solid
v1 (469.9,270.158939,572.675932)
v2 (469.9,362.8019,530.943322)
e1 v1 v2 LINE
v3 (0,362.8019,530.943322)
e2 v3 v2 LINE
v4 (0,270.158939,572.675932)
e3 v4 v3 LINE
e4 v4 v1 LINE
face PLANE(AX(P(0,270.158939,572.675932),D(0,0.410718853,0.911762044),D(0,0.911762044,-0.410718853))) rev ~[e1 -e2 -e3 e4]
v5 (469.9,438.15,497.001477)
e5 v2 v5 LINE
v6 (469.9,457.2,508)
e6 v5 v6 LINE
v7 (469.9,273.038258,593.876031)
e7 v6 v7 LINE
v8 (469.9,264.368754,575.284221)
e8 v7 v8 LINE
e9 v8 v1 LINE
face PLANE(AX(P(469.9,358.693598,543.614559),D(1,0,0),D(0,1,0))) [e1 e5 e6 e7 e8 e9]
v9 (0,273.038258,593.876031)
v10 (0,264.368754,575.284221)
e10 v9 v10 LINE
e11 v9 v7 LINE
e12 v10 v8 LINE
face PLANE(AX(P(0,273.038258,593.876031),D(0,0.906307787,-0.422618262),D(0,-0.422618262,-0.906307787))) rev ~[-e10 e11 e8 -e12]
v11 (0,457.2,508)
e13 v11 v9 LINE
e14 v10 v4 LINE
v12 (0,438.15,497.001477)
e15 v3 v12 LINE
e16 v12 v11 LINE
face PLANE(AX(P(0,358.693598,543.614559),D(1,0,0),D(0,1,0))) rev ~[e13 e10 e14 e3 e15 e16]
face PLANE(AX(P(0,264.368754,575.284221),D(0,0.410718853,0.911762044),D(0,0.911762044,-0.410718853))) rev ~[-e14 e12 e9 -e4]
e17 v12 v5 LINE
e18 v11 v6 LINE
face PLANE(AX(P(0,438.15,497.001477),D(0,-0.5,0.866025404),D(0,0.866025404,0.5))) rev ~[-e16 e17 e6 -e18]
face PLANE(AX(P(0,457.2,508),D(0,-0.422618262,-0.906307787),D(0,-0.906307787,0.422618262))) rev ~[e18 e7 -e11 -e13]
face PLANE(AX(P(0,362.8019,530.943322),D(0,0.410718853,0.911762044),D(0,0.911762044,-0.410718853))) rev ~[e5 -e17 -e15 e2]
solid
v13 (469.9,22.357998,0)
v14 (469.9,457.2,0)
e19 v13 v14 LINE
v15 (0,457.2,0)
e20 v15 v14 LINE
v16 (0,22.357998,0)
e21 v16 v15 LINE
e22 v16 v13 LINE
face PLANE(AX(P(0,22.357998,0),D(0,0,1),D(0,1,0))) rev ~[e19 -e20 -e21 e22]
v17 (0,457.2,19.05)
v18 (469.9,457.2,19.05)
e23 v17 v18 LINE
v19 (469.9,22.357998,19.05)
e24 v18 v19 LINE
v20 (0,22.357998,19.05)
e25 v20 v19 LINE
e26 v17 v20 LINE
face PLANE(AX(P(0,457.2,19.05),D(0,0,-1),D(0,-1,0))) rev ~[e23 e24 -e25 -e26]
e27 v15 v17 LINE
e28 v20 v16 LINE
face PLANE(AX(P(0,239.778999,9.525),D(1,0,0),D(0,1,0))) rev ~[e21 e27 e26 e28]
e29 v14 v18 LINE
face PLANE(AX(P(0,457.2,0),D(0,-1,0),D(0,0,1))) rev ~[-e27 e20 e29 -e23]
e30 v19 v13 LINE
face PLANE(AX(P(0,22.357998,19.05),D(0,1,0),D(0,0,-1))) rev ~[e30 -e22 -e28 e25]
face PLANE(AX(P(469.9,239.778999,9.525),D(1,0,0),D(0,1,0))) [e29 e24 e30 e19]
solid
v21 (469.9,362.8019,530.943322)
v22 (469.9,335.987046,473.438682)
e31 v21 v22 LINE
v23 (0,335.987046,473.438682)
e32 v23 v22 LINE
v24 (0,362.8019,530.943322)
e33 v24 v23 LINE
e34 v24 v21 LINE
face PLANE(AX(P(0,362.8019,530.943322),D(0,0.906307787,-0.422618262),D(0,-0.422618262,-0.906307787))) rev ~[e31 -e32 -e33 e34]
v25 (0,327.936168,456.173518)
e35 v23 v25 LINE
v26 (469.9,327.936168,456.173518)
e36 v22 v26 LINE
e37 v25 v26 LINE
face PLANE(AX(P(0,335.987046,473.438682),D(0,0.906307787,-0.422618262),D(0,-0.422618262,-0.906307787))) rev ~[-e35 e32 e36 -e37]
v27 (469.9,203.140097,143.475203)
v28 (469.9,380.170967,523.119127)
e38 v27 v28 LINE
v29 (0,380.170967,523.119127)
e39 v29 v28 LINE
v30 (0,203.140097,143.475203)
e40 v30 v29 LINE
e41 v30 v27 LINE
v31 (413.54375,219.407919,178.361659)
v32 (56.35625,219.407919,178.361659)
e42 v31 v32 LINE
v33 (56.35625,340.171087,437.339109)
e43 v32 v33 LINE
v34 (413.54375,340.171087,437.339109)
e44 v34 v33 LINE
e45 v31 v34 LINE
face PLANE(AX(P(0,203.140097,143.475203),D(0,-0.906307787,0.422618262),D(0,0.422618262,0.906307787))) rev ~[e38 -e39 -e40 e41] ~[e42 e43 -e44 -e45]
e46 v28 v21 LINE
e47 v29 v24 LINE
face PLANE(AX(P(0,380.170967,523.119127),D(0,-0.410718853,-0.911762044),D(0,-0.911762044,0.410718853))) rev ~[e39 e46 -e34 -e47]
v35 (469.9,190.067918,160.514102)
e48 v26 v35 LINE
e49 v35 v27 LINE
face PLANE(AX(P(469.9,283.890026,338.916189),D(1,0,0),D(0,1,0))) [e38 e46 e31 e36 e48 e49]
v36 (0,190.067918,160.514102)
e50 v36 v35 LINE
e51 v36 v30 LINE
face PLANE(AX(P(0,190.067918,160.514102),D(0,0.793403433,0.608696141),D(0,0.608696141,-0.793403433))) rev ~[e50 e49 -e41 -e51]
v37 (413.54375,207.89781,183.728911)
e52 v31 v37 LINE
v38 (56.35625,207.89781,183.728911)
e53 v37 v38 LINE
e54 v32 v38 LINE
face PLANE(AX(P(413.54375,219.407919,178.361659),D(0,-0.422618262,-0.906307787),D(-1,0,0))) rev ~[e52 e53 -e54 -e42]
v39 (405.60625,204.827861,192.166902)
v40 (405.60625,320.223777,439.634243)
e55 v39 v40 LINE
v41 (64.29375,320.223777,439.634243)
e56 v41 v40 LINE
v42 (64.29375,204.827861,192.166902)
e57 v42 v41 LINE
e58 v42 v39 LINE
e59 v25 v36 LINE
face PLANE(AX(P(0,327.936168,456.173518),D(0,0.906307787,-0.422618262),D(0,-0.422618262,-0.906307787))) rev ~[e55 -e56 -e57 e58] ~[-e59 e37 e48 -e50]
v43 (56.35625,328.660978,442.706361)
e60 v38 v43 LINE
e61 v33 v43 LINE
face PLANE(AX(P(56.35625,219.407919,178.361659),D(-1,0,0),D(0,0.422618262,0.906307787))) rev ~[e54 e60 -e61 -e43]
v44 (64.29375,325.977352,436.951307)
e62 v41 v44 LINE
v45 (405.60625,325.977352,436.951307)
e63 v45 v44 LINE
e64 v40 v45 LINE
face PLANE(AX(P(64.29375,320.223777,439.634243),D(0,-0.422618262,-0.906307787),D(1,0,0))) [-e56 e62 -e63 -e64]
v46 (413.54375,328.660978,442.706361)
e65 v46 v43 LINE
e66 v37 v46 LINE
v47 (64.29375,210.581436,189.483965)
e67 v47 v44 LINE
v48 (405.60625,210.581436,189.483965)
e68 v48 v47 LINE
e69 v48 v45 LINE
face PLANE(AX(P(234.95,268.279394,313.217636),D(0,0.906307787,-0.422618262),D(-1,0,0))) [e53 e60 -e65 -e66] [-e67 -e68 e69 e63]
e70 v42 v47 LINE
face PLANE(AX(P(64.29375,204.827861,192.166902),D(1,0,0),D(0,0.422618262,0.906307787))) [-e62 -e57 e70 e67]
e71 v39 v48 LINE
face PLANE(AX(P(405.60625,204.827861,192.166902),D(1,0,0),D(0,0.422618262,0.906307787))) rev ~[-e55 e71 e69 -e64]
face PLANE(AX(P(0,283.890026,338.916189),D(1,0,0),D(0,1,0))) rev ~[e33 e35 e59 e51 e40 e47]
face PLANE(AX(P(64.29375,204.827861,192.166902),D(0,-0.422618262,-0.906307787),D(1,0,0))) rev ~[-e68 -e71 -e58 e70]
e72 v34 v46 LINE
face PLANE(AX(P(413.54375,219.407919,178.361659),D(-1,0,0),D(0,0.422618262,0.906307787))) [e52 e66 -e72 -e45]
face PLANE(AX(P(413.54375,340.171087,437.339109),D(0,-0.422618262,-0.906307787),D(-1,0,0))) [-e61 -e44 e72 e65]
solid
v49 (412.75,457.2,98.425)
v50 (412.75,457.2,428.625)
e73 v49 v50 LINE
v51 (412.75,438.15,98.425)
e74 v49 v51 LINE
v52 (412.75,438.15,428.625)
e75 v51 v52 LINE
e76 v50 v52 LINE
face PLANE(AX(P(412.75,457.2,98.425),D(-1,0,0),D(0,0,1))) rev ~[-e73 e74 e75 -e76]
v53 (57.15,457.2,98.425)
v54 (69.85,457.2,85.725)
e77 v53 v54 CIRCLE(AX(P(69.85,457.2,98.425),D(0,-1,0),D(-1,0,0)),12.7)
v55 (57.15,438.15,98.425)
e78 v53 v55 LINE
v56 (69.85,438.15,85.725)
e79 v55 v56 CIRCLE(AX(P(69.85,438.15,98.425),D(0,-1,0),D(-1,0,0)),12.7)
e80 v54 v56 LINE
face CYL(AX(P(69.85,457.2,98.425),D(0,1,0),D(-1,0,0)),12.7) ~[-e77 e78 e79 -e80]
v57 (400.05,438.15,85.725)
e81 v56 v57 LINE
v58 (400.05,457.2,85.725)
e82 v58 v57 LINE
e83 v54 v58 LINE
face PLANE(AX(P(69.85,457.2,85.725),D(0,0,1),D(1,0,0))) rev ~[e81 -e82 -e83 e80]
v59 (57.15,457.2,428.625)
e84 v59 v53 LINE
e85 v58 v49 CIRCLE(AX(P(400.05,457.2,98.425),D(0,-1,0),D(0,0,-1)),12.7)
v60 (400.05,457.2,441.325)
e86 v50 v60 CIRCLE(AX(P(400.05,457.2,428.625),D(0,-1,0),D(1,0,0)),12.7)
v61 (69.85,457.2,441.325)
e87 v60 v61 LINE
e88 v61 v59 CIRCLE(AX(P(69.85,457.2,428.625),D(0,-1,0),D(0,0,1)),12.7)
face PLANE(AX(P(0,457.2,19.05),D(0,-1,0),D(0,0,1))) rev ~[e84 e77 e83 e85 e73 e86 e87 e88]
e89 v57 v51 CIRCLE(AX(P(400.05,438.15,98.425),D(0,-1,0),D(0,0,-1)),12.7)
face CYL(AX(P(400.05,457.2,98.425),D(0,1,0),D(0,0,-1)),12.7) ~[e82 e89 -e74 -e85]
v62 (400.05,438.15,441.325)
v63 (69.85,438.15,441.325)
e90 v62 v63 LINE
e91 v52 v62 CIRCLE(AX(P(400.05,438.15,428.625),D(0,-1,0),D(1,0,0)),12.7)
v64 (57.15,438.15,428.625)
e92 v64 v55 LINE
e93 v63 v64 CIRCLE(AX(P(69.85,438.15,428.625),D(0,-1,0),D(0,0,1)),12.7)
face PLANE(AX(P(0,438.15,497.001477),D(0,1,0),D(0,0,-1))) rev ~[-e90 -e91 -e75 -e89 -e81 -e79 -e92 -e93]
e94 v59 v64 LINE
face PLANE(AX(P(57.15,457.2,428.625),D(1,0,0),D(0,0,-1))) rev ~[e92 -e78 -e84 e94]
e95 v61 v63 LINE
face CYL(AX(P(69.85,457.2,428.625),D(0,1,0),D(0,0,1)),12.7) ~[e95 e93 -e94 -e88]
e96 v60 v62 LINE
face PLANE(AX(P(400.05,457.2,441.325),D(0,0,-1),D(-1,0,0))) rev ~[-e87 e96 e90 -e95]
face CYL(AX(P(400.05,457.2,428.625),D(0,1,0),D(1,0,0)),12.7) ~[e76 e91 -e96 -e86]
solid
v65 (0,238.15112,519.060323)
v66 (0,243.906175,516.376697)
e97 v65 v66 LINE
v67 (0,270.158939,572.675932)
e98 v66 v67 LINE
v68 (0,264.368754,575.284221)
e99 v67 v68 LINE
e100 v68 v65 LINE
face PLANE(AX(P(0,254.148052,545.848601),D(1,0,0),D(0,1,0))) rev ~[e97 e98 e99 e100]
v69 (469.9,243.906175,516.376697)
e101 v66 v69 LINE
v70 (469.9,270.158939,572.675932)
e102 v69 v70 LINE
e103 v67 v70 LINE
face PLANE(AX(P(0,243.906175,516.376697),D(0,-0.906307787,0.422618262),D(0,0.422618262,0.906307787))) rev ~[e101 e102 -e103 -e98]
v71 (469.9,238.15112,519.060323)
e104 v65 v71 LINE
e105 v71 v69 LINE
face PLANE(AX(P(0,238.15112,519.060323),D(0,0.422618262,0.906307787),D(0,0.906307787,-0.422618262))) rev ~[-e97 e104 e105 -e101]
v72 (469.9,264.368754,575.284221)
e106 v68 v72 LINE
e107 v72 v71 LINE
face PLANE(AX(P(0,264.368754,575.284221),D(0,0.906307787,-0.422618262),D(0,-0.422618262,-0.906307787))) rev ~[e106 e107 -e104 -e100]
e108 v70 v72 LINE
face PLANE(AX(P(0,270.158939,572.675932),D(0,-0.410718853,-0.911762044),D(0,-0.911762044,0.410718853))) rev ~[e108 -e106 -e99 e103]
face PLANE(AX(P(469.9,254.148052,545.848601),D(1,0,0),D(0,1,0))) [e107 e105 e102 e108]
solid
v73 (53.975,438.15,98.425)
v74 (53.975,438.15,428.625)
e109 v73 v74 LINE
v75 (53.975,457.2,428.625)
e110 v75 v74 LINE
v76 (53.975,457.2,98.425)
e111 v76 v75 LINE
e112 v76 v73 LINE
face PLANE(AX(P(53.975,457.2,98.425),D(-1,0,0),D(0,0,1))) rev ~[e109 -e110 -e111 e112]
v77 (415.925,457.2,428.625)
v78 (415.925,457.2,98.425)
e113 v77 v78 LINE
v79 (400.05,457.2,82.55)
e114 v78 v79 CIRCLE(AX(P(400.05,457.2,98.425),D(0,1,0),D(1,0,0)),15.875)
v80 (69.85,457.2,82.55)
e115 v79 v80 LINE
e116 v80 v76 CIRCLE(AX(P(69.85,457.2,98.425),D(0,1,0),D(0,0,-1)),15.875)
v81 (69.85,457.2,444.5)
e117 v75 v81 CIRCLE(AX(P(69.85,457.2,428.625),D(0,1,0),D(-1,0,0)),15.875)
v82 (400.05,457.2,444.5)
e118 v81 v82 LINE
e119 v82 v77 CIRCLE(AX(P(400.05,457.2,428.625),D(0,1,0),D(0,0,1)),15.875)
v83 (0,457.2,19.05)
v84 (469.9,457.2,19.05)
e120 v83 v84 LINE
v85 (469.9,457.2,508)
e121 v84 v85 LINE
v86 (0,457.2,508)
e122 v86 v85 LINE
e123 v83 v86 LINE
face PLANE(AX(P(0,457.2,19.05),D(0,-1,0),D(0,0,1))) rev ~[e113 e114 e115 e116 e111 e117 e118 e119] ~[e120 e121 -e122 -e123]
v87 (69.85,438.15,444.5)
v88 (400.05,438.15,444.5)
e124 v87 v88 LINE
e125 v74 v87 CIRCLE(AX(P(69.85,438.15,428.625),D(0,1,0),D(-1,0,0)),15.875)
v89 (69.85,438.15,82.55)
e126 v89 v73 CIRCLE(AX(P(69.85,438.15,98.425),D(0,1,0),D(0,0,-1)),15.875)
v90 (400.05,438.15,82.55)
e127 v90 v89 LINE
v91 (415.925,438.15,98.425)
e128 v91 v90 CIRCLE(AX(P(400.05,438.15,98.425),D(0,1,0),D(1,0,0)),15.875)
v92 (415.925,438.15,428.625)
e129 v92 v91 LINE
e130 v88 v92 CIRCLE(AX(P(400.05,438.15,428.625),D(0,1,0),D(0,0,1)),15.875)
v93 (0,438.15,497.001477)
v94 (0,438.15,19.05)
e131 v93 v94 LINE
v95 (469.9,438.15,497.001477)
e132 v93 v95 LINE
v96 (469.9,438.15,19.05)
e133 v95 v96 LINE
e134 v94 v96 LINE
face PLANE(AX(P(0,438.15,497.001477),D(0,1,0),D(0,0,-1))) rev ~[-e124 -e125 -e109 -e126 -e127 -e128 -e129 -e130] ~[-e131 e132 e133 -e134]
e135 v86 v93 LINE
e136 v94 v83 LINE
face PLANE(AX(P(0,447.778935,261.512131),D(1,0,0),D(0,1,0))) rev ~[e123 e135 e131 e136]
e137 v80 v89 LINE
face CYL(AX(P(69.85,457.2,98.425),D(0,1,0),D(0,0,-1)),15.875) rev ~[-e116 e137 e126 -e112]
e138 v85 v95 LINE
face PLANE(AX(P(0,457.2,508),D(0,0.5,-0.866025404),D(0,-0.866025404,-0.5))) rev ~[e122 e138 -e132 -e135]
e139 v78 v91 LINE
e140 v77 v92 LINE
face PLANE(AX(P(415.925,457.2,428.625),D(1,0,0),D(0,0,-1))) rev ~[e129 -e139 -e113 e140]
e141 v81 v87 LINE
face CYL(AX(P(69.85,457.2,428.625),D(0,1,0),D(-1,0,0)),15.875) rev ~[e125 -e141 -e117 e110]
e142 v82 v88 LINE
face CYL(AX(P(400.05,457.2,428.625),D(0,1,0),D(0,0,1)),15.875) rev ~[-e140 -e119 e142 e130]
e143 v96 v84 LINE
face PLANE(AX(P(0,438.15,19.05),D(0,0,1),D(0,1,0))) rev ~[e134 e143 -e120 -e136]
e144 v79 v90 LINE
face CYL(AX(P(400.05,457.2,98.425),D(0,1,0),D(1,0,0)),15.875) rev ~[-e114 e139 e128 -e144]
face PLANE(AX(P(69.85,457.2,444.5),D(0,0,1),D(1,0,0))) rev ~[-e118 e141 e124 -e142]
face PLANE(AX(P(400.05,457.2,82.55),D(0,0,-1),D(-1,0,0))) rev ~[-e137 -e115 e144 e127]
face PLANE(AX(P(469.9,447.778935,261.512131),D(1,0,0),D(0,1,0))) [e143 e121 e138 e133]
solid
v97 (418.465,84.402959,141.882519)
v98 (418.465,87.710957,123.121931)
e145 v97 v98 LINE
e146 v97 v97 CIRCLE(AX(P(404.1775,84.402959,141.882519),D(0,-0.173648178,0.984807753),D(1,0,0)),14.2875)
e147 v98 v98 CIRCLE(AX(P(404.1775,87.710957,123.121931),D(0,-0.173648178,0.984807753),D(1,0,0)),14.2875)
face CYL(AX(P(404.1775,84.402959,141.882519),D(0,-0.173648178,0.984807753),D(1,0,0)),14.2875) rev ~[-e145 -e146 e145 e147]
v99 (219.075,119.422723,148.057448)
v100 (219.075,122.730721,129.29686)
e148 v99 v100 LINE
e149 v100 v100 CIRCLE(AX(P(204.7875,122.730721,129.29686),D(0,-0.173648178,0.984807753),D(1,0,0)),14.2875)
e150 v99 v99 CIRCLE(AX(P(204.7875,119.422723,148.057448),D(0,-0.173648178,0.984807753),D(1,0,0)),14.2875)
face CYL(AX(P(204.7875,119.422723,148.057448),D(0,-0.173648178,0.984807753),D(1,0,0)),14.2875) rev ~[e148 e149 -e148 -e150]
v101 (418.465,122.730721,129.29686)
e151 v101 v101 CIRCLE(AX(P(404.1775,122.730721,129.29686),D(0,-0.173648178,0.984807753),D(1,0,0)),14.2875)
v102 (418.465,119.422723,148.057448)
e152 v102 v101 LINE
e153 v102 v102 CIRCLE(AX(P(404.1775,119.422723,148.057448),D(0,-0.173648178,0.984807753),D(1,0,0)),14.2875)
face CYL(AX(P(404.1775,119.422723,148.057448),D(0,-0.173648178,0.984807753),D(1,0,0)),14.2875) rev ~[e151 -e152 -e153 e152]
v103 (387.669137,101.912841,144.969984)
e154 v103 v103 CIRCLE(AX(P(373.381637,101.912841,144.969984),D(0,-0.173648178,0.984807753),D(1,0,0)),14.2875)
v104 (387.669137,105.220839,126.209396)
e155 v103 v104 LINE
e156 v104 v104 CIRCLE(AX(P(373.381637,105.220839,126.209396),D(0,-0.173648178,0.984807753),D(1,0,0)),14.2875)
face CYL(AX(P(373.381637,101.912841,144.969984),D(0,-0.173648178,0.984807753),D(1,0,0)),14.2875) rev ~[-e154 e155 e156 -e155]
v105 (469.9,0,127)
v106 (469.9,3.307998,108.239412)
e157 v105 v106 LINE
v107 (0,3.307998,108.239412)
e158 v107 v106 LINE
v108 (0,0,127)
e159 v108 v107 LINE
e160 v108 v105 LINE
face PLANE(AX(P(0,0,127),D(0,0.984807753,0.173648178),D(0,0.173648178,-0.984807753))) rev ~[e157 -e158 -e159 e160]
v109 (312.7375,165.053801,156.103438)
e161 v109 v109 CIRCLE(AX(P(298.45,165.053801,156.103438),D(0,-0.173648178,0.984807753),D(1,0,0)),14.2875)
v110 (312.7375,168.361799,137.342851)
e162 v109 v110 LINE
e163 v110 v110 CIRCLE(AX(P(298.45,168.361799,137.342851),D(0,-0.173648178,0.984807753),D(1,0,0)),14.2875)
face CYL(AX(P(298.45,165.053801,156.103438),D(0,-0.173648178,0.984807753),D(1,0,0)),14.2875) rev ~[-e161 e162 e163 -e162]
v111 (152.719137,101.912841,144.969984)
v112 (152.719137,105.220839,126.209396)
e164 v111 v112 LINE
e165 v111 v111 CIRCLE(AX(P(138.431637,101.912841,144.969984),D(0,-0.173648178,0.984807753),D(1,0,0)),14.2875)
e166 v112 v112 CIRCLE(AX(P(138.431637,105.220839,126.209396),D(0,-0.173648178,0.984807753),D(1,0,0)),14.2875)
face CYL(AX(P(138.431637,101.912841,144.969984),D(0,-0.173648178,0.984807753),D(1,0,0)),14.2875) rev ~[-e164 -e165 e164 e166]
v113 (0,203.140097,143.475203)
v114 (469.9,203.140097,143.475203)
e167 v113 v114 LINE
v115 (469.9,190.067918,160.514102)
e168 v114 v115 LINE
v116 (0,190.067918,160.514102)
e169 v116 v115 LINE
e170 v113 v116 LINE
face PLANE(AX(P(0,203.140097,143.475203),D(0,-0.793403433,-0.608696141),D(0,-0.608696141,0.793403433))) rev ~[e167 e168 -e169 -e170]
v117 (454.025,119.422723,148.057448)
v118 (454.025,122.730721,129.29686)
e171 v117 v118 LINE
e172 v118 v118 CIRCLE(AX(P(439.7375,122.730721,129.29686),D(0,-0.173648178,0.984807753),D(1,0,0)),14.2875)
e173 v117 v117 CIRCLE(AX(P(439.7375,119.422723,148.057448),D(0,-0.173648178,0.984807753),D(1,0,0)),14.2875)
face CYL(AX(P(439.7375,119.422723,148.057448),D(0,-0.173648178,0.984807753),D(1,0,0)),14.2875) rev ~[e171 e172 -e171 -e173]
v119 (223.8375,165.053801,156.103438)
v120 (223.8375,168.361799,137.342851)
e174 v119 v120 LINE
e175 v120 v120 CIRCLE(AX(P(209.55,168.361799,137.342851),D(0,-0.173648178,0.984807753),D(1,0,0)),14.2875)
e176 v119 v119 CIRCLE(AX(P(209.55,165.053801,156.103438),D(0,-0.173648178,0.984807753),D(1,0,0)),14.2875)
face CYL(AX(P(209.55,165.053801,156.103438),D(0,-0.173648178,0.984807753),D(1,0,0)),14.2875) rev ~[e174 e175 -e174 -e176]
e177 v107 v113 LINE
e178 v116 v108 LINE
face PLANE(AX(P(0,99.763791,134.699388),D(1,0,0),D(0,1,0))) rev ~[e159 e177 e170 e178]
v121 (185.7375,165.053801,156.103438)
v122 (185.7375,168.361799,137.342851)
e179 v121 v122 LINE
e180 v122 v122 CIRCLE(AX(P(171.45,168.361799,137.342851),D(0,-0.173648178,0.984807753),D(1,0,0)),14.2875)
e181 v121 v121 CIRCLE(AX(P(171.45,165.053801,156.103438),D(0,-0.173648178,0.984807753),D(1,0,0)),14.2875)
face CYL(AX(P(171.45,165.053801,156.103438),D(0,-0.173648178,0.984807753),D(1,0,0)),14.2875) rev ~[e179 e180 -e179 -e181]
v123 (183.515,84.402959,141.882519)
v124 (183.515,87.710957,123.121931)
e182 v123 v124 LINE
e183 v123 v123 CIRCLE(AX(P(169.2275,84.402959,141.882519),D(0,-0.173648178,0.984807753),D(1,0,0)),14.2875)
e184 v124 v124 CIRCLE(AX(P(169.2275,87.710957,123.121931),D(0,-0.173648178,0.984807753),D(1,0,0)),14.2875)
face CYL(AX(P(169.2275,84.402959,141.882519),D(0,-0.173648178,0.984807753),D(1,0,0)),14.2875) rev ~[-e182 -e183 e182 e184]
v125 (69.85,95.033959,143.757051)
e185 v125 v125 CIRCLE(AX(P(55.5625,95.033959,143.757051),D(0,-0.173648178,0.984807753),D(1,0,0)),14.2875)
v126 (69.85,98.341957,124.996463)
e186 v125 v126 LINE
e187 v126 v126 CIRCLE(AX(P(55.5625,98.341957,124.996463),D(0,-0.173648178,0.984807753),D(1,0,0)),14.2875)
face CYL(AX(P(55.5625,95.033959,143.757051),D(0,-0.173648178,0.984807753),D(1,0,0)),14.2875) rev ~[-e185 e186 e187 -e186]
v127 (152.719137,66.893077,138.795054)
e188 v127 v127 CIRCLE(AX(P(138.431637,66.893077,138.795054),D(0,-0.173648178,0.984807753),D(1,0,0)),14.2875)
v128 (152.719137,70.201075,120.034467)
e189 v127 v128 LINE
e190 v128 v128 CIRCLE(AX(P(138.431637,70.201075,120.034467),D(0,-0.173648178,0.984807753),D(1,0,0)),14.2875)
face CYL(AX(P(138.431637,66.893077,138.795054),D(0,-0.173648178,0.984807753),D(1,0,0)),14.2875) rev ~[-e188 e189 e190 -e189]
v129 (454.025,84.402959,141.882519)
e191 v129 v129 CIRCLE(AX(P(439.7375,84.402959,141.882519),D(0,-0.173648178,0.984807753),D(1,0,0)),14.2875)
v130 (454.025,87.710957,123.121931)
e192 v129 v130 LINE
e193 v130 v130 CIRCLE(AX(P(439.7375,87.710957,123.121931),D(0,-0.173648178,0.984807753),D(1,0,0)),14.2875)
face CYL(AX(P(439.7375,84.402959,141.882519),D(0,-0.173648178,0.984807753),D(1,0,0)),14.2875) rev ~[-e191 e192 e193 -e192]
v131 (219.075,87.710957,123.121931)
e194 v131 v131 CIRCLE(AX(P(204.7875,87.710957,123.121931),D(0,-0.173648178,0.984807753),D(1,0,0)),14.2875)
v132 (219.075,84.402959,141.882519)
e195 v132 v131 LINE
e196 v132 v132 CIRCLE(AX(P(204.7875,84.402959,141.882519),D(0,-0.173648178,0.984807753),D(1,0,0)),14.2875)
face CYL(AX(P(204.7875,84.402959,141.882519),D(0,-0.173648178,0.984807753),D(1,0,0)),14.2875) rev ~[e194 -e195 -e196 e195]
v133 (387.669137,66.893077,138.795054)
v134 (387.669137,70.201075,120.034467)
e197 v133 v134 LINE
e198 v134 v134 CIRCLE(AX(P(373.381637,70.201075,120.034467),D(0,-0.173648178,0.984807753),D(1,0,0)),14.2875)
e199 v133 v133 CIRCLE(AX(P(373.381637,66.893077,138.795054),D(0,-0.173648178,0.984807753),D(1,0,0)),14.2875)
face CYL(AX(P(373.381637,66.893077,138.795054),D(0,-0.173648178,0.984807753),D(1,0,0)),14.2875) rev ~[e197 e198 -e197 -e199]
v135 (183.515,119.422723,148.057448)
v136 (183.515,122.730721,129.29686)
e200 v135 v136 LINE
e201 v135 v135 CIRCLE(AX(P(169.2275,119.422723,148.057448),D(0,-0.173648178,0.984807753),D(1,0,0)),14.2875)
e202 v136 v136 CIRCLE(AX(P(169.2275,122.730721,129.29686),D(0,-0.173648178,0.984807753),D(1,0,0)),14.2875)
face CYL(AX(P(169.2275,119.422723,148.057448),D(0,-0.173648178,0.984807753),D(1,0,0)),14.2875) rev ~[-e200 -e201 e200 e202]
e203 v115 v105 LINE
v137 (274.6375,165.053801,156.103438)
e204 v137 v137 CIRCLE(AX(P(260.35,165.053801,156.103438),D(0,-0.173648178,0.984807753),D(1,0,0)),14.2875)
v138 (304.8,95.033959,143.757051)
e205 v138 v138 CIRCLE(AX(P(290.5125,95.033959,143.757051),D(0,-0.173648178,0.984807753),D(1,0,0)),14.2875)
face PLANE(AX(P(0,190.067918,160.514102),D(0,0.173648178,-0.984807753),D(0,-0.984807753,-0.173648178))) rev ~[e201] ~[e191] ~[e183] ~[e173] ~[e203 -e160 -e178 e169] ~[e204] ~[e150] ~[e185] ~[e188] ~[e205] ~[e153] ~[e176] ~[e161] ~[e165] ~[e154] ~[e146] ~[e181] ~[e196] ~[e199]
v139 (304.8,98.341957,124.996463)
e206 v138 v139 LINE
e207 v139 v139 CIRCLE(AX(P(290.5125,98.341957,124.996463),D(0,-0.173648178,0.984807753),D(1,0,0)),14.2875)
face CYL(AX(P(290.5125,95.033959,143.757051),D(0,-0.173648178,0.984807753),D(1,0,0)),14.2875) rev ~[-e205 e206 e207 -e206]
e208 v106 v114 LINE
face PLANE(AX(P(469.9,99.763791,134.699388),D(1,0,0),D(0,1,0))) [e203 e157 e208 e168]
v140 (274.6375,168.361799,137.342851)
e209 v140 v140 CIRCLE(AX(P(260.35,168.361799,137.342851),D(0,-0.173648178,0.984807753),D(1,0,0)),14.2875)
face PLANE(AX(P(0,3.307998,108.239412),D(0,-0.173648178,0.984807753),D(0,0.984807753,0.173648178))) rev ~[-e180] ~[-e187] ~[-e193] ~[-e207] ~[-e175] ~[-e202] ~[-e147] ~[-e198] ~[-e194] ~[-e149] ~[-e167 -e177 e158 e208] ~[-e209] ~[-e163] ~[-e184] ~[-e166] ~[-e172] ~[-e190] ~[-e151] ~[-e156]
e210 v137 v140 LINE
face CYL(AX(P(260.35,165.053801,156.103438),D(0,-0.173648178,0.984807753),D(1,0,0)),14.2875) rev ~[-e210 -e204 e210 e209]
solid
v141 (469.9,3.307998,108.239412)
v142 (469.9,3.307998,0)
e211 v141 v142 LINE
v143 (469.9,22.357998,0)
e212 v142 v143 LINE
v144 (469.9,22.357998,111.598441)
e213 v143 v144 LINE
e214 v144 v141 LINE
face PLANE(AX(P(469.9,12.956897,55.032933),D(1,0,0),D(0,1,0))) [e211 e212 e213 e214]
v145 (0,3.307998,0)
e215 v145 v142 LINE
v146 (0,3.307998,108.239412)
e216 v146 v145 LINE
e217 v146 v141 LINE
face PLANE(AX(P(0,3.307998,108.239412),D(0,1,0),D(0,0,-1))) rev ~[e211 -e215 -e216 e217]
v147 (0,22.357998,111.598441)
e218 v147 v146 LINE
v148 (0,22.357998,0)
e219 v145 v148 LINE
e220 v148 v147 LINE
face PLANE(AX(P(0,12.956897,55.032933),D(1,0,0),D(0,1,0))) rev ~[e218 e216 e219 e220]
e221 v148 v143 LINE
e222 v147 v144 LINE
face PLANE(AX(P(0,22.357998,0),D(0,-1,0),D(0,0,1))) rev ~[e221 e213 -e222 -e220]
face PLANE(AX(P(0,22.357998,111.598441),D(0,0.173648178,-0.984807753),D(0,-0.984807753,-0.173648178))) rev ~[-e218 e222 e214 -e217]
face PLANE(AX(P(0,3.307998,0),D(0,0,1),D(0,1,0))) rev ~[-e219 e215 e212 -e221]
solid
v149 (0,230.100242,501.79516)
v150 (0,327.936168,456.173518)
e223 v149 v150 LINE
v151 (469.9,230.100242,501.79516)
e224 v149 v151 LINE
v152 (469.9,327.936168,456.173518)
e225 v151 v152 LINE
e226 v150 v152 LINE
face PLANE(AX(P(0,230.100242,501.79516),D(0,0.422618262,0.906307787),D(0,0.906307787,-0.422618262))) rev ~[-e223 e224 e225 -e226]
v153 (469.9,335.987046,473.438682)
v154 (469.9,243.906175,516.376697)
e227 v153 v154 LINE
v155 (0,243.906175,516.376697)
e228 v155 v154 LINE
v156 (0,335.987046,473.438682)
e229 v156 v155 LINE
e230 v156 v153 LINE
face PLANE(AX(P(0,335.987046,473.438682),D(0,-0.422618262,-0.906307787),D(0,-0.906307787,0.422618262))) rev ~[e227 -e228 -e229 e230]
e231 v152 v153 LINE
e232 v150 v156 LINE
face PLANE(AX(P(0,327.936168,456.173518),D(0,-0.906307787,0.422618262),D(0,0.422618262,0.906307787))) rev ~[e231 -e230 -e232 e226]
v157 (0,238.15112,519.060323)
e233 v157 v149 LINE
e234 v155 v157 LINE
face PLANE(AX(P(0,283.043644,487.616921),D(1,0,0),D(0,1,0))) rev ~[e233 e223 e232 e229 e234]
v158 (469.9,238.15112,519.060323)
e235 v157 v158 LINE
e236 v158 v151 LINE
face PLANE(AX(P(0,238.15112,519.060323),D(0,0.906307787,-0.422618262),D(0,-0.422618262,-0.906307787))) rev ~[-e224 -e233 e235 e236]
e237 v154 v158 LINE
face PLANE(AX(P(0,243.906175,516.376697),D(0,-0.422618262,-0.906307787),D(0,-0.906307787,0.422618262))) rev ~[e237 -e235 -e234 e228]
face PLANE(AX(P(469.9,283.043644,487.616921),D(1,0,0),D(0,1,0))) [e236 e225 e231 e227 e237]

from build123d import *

# Parameters (mm, degrees)
F1_DEPTH  = 469.9
F2_DEPTH  = 469.9
F3_DEPTH  = 469.9
F4_DEPTH  = 469.9
F5_DEPTH  = 469.9
F6_DEPTH  = 469.9
F7_DEPTH  = 469.9
F8_DEPTH  = 469.9
F9_R      = 14.2875
F10_DEPTH = 19.05
F11_W     = 341.3125
F11_H     = 273.05
F12_DEPTH = 19.05
F14_DEPTH = 19.05
F15_W     = 357.1875
F15_H     = 285.75
F15_W_2   = 341.3125
F15_H_2   = 273.05
F16_DEPTH = 12.7


with BuildPart() as f1:
    # F0 (on Right) → F1 (new body)
    with BuildSketch(Plane.YZ):
        Polygon((457.2, 19.05), (457.2, 508), (438.15, 497.0014773719), (438.15, 19.05), align=None)
    extrude(amount=F1_DEPTH)

    # F13 (on face) → F14 (cut)
    with BuildSketch(Plane(origin=(0, 457.2, 0), x_dir=(-1, 0, 0), z_dir=(0, 1, 0))):
        with BuildLine():
            Line((-400.05, 82.55), (-69.85, 82.55))
            ThreePointArc((-69.85, 82.55), (-58.6246798487, 87.1996798487), (-53.975, 98.425))
            Line((-53.975, 98.425), (-53.975, 428.625))
            ThreePointArc((-53.975, 428.625), (-58.6246798487, 439.8503201513), (-69.85, 444.5))
            Line((-69.85, 444.5), (-400.05, 444.5))
            ThreePointArc((-400.05, 444.5), (-411.2753201513, 439.8503201513), (-415.925, 428.625))
            Line((-415.925, 428.625), (-415.925, 98.425))
            ThreePointArc((-415.925, 98.425), (-411.2753201513, 87.1996798487), (-400.05, 82.55))
        make_face()
        with BuildLine():
            Line((-69.85, 85.725), (-400.05, 85.725))
            ThreePointArc((-400.05, 85.725), (-409.0302561211, 89.4447438789), (-412.75, 98.425))
            Line((-412.75, 98.425), (-412.75, 428.625))
            ThreePointArc((-412.75, 428.625), (-409.0302561211, 437.6052561211), (-400.05, 441.325))
            Line((-400.05, 441.325), (-69.85, 441.325))
            ThreePointArc((-69.85, 441.325), (-60.8697438789, 437.6052561211), (-57.15, 428.625))
            Line((-57.15, 428.625), (-57.15, 98.425))
            ThreePointArc((-57.15, 98.425), (-60.8697438789, 89.4447438789), (-69.85, 85.725))
        make_face(mode=Mode.SUBTRACT)
    extrude(amount=-F14_DEPTH, mode=Mode.SUBTRACT)


with BuildPart() as f2:
    # F0 (on Right) → F2 (new body)
    with BuildSketch(Plane.YZ):
        Polygon((438.15, 497.0014773719), (457.2, 508), (273.0382576742, 593.8760307857), (264.3687541785, 575.284220542), (270.1589392144, 572.6759323695), (362.8018997891, 530.94332161), (380.1709667192, 523.1191274677), align=None)
    extrude(amount=F2_DEPTH)


with BuildPart() as f3:
    # F0 (on Right) → F3 (new body)
    with BuildSketch(Plane.YZ):
        Polygon((457.2, 0), (457.2, 19.05), (438.15, 19.05), (22.3579977846, 19.05), (22.3579977846, 0), align=None)
    extrude(amount=F3_DEPTH)


with BuildPart() as f4:
    # F0 (on Right) → F4 (new body)
    with BuildSketch(Plane.YZ):
        Polygon((22.3579977846, 0), (22.3579977846, 19.05), (22.3579977846, 111.5984412876), (3.3079977846, 108.2394123051), (3.3079977846, 0), align=None)
    extrude(amount=F4_DEPTH)


with BuildPart() as f5:
    # F0 (on Right) → F5 (new body)
    with BuildSketch(Plane.YZ):
        Polygon((22.3579977846, 111.5984412876), (203.1400974051, 143.4752030798), (190.067917926, 160.5141020974), (0, 127), (3.3079977846, 108.2394123051), align=None)
    extrude(amount=F5_DEPTH)

    # F9 (on face) → F10 (cut)
    with BuildSketch(Plane(origin=(0, -21.7182791012, 123.1704814199), x_dir=(1, 0, 0), z_dir=(0, -0.1736481777, 0.984807753))):
        with Locations((138.4316366414, 125.5383295276)):
            Circle(F9_R)
        with Locations((138.4316366414, 89.9783295276)):
            Circle(F9_R)
        with Locations((169.2275, 107.7583295276)):
            Circle(F9_R)
        with Locations((169.2275, 143.3183295276)):
            Circle(F9_R)
        with Locations((204.7875, 143.3183295276)):
            Circle(F9_R)
        with Locations((204.7875, 107.7583295276)):
            Circle(F9_R)
        with Locations((171.45, 189.6533404915)):
            Circle(F9_R)
        with Locations((209.55, 189.6533404915)):
            Circle(F9_R)
        with Locations((55.5625, 118.5533295276)):
            Circle(F9_R)
        with Locations((260.35, 189.6533404915)):
            Circle(F9_R)
        with Locations((298.45, 189.6533404915)):
            Circle(F9_R)
        with Locations((290.5125, 118.5533295276)):
            Circle(F9_R)
        with Locations((373.3816366414, 89.9783295276)):
            Circle(F9_R)
        with Locations((373.3816366414, 125.5383295276)):
            Circle(F9_R)
        with Locations((404.1775, 107.7583295276)):
            Circle(F9_R)
        with Locations((404.1775, 143.3183295276)):
            Circle(F9_R)
        with Locations((439.7375, 143.3183295276)):
            Circle(F9_R)
        with Locations((439.7375, 107.7583295276)):
            Circle(F9_R)
    extrude(amount=-F10_DEPTH, mode=Mode.SUBTRACT)


with BuildPart() as f6:
    # F0 (on Right) → F6 (new body)
    with BuildSketch(Plane.YZ):
        Polygon((203.1400974051, 143.4752030798), (380.1709667192, 523.1191274677), (362.8018997891, 530.94332161), (335.9870457781, 473.4386816109), (327.9361678919, 456.1735182679), (190.067917926, 160.5141020974), align=None)
    extrude(amount=F6_DEPTH)

    # F11 (on face) → F12 (cut)
    with BuildSketch(Plane(origin=(0, 94.6401423069, -44.1314231266), x_dir=(1, 0, 0), z_dir=(0, -0.906307787, 0.4226182617))):
        with Locations((234.95, 397.2513537467)):
            Rectangle(F11_W, F11_H)
    extrude(amount=-F12_DEPTH, mode=Mode.SUBTRACT)

    # F15 (on face) → F16 (cut)
    with BuildSketch(Plane(origin=(0, 111.9038265015, -52.1816112745), x_dir=(-1, 0, 0), z_dir=(0, 0.906307787, -0.4226182617))):
        with Locations((-234.95, 397.2513537467)):
            Rectangle(F15_W, F15_H)
        with Locations((-234.95, 397.2513537467)):
            Rectangle(F15_W_2, F15_H_2, mode=Mode.SUBTRACT)
    extrude(amount=-F16_DEPTH, mode=Mode.SUBTRACT)


with BuildPart() as f7:
    # F0 (on Right) → F7 (new body)
    with BuildSketch(Plane.YZ):
        Polygon((243.9061746151, 516.3766970038), (238.1511201675, 519.0603229658), (230.1002422813, 501.7951596228), (327.9361678919, 456.1735182679), (335.9870457781, 473.4386816109), align=None)
    extrude(amount=F7_DEPTH)


with BuildPart() as f8:
    # F0 (on Right) → F8 (new body)
    with BuildSketch(Plane.YZ):
        Polygon((270.1589392144, 572.6759323695), (264.3687541785, 575.284220542), (238.1511201675, 519.0603229658), (243.9061746151, 516.3766970038), align=None)
    extrude(amount=F8_DEPTH)


solid = Compound([f1.part, f2.part, f3.part, f4.part, f5.part, f6.part, f7.part, f8.part])
